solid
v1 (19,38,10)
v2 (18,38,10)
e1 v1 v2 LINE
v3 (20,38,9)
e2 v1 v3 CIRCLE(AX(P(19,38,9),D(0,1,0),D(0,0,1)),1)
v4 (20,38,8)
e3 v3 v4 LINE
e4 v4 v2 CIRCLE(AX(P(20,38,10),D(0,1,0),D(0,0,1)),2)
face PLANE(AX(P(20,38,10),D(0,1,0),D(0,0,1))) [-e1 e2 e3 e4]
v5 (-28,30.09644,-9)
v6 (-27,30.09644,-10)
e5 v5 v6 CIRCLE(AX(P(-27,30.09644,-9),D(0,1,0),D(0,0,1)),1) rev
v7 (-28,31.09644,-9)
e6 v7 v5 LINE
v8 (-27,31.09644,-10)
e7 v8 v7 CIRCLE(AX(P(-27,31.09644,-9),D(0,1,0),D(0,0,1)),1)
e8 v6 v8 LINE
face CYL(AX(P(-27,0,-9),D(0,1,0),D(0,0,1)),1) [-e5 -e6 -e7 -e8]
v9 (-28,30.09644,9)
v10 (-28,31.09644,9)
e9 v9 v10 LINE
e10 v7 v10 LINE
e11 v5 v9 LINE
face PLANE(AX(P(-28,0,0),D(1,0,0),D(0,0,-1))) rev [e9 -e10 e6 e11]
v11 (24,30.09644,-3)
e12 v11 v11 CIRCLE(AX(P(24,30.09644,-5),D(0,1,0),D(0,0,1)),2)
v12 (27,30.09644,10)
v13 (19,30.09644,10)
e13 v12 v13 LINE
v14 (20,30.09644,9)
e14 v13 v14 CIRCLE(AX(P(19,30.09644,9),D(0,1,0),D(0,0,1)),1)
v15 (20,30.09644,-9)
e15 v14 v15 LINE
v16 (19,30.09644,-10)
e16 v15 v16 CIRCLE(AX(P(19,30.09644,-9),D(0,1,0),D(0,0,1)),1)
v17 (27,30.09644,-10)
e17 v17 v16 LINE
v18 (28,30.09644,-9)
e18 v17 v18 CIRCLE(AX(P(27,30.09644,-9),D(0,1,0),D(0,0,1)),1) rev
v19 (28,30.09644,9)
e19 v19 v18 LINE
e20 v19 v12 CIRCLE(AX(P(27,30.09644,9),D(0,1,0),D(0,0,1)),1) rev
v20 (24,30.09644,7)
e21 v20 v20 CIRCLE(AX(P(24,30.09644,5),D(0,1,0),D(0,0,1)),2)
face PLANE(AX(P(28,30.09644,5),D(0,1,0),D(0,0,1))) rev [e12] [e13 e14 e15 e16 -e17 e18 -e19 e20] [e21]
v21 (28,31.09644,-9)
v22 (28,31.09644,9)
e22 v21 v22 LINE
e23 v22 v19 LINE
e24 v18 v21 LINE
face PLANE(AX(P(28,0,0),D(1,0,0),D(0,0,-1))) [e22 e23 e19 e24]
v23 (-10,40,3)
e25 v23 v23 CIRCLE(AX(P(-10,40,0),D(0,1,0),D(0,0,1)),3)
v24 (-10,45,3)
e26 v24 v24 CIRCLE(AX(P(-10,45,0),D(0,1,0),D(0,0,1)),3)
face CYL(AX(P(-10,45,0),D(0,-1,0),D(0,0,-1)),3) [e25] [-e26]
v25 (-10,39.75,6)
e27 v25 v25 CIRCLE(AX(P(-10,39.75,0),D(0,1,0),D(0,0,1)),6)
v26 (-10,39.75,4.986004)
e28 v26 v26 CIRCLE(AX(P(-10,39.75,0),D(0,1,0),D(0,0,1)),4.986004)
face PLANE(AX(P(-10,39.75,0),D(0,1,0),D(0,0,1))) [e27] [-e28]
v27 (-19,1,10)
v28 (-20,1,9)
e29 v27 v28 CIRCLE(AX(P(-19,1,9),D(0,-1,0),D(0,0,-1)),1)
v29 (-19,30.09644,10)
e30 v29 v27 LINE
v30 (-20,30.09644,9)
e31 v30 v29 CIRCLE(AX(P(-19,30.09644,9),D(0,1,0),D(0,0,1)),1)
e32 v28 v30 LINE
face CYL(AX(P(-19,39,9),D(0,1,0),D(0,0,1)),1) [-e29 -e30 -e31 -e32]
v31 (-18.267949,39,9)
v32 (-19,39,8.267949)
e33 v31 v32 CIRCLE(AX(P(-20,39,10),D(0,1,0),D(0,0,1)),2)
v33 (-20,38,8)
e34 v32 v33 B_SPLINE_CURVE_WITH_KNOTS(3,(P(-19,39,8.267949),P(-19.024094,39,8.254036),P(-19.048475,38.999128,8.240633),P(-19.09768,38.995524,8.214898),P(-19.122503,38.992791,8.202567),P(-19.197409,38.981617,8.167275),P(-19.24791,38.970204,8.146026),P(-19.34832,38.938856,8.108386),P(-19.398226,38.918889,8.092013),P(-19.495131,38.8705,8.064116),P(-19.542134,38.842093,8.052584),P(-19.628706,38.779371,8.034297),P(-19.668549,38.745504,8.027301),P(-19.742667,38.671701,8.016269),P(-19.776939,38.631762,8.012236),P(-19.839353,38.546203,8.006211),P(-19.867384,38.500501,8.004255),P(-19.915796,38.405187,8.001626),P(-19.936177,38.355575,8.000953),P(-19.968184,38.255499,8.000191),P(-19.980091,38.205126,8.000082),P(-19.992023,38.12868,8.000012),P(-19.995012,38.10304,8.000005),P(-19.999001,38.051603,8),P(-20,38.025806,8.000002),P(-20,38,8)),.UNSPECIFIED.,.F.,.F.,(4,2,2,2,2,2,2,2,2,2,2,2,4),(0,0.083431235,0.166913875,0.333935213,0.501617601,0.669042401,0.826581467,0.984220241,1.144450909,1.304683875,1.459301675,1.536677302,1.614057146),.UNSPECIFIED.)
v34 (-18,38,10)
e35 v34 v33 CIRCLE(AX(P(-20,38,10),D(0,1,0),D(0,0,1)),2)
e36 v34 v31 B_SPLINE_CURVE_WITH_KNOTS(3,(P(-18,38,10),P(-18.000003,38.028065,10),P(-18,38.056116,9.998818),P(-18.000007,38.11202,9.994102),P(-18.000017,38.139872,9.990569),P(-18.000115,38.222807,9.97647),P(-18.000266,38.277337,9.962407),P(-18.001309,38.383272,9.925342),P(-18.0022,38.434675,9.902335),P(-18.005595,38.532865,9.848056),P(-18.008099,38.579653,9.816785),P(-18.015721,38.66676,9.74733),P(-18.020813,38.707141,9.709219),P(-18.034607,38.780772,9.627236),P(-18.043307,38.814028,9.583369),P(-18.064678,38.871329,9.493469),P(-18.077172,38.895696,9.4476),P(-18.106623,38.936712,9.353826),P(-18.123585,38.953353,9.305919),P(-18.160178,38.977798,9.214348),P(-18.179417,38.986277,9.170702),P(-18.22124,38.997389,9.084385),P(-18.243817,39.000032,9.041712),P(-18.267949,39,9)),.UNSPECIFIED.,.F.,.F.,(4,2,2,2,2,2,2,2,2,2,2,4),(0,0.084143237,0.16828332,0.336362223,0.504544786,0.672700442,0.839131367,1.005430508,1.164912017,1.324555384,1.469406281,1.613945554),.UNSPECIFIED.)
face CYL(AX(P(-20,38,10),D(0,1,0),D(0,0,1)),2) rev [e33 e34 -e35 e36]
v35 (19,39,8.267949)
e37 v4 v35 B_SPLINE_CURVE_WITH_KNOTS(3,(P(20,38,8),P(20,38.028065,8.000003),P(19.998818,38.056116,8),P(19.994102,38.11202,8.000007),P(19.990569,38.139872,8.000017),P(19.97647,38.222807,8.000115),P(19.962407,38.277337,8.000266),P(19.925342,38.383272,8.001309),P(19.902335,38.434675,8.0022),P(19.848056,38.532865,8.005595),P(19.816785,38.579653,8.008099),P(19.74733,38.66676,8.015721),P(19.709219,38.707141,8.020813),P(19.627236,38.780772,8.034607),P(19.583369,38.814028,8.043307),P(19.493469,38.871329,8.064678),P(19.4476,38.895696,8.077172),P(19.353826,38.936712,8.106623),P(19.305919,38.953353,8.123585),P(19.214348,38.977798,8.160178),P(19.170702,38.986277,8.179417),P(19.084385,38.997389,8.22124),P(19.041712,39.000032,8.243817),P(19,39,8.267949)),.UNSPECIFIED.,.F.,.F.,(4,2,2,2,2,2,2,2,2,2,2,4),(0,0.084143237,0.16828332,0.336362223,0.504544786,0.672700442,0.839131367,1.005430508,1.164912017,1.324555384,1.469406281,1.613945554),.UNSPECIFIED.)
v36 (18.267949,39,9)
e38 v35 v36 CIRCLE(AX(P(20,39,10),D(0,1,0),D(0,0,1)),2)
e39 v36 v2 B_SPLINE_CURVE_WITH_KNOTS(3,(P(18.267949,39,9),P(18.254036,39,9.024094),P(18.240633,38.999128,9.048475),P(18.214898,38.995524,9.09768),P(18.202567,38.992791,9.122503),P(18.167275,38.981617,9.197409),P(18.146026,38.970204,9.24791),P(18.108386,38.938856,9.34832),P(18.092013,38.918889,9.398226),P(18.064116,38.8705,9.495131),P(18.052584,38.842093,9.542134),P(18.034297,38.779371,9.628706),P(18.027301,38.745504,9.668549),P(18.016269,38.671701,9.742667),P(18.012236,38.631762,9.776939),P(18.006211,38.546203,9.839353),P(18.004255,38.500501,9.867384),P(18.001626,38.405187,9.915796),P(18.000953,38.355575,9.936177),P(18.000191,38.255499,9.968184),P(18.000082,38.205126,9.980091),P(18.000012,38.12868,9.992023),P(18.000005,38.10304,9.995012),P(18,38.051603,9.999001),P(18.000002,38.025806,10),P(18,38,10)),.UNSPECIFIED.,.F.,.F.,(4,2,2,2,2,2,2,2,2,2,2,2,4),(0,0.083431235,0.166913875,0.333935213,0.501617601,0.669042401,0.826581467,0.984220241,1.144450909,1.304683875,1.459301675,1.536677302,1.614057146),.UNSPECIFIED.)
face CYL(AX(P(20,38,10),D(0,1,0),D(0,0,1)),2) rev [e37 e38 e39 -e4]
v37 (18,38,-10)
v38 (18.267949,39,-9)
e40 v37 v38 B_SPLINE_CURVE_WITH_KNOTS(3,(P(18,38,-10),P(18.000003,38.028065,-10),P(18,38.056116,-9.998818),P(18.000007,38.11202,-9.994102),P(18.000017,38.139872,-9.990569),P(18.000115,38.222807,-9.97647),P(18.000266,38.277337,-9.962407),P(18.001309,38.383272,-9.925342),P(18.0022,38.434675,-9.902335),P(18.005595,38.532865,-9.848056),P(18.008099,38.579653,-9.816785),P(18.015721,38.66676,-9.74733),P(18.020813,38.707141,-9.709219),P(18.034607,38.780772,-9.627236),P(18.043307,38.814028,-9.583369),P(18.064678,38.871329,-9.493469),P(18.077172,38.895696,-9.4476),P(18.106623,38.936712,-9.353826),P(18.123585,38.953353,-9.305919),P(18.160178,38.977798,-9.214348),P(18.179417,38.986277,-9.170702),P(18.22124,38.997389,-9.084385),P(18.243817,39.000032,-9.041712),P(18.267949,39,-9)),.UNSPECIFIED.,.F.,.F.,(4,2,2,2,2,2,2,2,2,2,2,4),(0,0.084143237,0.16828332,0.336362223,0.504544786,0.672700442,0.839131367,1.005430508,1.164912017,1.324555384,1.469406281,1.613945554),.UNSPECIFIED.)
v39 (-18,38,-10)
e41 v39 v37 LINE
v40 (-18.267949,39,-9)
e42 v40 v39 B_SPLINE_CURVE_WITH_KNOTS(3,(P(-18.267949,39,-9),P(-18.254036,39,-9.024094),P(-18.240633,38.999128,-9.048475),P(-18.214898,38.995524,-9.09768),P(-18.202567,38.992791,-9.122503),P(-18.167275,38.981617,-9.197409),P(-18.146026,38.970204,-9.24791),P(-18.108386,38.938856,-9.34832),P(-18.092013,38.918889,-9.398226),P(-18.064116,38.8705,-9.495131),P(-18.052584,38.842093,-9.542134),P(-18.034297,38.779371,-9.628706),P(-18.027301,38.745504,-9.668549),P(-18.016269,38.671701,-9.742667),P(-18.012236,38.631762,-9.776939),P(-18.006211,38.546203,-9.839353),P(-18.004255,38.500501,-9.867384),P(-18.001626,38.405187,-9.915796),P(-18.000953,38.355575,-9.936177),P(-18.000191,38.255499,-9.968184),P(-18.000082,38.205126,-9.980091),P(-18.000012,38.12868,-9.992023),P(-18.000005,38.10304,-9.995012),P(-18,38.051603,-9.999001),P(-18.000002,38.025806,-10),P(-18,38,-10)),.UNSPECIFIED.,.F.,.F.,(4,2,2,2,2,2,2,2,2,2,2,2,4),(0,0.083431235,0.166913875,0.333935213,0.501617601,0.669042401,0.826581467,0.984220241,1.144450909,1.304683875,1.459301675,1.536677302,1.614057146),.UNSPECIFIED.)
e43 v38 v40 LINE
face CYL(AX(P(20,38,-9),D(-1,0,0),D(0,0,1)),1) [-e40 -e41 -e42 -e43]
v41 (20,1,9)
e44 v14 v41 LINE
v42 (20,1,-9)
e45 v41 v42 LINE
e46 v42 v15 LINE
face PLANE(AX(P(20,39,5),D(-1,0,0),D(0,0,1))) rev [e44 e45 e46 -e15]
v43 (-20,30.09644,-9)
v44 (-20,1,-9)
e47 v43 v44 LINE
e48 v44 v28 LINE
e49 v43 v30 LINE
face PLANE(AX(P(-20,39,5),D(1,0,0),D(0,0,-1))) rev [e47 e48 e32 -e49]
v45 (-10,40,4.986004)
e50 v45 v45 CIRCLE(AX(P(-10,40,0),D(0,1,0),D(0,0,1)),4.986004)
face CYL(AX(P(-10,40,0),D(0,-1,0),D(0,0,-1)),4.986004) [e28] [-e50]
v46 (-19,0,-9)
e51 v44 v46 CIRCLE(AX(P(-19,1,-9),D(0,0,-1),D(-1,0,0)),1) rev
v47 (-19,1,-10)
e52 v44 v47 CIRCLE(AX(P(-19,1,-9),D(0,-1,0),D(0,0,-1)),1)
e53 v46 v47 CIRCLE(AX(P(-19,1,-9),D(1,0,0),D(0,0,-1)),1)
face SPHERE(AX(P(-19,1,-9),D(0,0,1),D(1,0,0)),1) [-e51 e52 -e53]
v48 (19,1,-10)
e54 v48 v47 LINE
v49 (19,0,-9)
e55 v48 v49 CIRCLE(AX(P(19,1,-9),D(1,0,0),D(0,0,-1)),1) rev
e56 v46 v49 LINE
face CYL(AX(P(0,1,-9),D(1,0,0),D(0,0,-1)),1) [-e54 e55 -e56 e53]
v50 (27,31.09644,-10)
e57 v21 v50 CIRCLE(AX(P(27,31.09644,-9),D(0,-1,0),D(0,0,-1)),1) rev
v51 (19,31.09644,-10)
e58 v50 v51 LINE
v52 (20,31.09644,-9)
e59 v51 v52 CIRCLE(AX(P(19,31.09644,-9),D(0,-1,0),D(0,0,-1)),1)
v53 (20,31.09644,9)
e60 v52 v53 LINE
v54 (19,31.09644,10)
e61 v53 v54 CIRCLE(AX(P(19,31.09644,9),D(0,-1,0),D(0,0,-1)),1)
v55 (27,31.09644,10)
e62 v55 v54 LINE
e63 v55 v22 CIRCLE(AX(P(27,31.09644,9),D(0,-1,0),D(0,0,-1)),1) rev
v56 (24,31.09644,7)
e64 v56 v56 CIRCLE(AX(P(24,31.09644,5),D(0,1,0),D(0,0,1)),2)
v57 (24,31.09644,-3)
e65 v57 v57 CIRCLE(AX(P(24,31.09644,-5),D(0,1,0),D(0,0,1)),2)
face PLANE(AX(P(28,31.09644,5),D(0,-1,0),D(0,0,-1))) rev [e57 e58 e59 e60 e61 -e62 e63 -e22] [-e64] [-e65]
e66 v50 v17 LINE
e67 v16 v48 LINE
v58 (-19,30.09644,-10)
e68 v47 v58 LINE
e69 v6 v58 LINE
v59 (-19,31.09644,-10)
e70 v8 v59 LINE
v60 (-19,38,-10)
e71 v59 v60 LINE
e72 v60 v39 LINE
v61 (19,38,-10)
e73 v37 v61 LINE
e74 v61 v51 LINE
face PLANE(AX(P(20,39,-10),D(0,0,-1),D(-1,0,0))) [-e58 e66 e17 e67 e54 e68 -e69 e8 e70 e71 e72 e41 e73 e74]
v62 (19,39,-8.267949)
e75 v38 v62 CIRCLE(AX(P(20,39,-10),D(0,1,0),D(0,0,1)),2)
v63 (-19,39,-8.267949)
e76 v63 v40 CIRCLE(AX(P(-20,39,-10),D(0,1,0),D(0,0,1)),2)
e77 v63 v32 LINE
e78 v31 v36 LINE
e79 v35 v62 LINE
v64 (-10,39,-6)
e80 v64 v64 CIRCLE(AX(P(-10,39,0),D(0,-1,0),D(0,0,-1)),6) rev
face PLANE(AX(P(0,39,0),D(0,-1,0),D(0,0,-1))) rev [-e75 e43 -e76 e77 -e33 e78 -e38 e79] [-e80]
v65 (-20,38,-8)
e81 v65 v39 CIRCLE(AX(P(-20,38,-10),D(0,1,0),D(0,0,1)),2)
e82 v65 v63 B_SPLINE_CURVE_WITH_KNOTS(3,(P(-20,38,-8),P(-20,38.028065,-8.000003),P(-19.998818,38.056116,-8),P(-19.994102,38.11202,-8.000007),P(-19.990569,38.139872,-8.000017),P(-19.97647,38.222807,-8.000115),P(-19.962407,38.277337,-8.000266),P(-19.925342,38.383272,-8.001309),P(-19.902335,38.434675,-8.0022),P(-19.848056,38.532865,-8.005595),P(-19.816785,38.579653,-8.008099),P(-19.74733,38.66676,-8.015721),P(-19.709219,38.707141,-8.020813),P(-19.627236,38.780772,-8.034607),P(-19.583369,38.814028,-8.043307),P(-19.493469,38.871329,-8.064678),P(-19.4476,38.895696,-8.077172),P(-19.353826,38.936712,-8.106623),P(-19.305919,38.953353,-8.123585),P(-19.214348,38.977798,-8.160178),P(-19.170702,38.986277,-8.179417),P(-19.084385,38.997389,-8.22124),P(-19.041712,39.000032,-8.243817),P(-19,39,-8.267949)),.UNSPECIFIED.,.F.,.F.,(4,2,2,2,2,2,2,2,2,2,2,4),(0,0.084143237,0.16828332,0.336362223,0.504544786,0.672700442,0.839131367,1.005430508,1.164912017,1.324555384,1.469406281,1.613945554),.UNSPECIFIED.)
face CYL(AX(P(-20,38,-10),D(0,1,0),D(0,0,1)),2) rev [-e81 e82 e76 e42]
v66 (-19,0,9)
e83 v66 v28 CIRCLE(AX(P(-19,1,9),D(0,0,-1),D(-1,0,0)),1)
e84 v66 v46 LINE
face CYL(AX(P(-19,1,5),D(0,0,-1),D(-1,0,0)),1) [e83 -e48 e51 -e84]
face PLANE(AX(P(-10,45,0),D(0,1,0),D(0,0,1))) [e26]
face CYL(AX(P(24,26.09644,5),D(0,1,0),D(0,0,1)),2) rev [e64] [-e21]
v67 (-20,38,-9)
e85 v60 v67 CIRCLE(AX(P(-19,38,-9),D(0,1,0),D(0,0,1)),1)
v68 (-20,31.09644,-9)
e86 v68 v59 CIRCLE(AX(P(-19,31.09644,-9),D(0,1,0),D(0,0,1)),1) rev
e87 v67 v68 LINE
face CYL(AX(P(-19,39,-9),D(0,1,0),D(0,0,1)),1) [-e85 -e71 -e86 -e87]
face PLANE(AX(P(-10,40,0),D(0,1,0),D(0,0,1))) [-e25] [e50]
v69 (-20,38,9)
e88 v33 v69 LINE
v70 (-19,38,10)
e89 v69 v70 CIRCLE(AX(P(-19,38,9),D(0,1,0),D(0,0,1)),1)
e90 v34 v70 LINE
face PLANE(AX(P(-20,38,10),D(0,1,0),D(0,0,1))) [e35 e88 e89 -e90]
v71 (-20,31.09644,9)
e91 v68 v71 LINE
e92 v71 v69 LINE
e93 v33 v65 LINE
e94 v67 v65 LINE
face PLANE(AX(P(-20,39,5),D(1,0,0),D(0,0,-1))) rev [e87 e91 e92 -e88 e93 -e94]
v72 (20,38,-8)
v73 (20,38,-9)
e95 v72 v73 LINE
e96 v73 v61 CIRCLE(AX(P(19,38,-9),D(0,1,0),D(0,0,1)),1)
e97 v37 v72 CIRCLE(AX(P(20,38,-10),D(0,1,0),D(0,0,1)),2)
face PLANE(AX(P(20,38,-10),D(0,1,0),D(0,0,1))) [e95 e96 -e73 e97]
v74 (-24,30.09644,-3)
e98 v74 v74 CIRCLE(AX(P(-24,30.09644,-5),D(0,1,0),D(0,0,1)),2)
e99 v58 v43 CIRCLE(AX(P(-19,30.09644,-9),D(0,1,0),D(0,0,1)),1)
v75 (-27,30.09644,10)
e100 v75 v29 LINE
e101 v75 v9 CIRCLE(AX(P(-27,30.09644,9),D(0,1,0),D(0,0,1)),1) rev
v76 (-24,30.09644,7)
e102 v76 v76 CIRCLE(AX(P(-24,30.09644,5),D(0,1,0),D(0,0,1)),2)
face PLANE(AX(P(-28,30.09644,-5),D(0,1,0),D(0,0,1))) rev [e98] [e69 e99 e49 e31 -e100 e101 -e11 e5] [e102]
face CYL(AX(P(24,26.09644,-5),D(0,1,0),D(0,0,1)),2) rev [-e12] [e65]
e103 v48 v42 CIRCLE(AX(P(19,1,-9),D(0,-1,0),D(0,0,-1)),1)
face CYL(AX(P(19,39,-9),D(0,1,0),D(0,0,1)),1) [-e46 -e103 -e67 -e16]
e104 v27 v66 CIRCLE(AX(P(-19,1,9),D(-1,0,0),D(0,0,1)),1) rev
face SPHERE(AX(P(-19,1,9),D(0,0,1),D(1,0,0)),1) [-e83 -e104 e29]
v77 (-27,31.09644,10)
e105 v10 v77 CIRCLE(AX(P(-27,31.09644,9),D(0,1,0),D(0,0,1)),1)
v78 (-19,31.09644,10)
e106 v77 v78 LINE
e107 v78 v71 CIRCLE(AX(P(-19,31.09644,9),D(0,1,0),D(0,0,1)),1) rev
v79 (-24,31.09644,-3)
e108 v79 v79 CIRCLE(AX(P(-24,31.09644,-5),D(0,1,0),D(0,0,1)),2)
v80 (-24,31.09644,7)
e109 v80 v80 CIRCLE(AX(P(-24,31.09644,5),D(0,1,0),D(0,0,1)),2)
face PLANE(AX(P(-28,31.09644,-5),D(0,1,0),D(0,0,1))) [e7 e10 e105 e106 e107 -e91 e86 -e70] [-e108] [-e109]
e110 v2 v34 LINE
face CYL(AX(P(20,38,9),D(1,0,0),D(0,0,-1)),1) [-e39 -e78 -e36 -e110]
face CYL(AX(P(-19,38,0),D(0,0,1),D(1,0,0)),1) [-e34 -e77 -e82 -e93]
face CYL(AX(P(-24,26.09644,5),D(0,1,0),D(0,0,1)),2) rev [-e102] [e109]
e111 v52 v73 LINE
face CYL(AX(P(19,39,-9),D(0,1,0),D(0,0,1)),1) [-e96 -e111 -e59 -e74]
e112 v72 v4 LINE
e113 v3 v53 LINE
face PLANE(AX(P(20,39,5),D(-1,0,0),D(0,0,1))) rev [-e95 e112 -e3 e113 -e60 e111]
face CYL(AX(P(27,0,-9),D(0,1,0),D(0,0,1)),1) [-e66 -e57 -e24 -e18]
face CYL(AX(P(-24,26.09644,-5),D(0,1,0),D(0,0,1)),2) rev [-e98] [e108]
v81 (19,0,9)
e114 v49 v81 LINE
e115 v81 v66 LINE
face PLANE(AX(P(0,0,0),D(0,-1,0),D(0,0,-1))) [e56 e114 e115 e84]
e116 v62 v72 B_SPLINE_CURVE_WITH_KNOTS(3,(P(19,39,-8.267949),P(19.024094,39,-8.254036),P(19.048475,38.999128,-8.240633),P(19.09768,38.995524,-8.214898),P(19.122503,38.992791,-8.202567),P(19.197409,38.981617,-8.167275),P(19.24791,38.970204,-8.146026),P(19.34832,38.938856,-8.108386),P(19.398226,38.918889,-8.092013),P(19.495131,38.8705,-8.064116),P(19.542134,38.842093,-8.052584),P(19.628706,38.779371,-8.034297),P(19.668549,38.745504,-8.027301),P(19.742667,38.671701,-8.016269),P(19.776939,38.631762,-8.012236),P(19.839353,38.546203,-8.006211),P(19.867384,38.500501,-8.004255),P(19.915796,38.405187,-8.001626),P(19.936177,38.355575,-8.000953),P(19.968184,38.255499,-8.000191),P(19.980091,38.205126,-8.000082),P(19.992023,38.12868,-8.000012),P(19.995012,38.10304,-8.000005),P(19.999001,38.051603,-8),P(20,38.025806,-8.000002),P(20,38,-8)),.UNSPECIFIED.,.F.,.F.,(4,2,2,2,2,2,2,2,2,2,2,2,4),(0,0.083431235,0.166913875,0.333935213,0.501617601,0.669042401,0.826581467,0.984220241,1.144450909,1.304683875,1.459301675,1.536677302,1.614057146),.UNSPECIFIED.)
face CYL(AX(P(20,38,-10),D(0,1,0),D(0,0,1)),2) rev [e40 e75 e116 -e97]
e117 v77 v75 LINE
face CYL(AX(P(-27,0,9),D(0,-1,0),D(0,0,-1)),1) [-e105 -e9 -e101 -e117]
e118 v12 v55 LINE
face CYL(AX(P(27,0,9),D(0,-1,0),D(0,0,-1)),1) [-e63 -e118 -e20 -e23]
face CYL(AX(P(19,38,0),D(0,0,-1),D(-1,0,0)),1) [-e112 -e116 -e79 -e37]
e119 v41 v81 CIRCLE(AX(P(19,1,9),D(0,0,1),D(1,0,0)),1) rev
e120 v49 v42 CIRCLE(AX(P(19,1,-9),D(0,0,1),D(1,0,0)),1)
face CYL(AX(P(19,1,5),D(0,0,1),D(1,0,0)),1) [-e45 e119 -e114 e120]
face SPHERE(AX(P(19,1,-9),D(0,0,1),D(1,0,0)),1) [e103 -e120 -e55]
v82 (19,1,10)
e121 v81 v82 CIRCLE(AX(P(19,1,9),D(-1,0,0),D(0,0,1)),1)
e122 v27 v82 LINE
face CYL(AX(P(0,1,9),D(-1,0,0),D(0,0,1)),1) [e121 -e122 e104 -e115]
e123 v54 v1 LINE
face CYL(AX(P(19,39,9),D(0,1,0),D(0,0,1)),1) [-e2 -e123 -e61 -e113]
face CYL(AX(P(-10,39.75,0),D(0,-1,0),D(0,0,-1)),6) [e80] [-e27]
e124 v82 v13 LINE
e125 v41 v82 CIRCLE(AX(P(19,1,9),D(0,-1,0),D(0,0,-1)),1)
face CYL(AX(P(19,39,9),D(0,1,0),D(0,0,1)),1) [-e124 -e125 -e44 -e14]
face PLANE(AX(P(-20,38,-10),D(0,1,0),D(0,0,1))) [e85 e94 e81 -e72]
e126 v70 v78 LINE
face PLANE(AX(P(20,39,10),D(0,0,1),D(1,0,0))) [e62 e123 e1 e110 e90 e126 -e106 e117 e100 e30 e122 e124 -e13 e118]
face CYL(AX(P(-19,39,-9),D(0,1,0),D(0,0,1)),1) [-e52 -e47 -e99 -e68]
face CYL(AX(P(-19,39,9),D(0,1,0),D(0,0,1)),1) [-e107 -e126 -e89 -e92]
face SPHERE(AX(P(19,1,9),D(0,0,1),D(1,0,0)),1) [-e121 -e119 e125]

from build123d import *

# Parameters (mm, degrees)
SKETCH_1_W          = 40
SKETCH_1_H          = 10
EXTRUDE_2_DEPTH     = 39
SKETCH_4_W          = 10
SKETCH_4_H          = 1
EXTRUDE_8_DEPTH     = 8
SKETCH_12_W         = 10
SKETCH_12_H         = 1
EXTRUDE_9_DEPTH     = 8
SKETCH_14_W         = 40
SKETCH_14_H         = 20
EXTRUDE_10_DEPTH    = 39
SKETCH_15_W         = 20
SKETCH_15_H         = 1
EXTRUDE_12_DEPTH    = 8
SKETCH_16_W         = 20
SKETCH_16_H         = 1
EXTRUDE_13_DEPTH    = 8
SKETCH_17_R         = 6
EXTRUDE_15_DEPTH    = 0.75
SKETCH_19_R         = 4.98600358
EXTRUDE_16_DEPTH    = 0.25
SKETCH_20_R         = 3
EXTRUDE_17_DEPTH    = 5
SKETCH_22_R         = 2
CUT_EXTRUDE_1_DEPTH = 5
SKETCH_23_R         = 2
CUT_EXTRUDE_3_DEPTH = 5
FILLET_12_R         = 1
FILLET_13_R         = 1
SKETCH_27_R         = 2
CUT_EXTRUDE_4_DEPTH = 1
FILLET_14_R         = 1
FILLET_START        = -9
FILLET_15_DEPTH     = 18
FILLET_START_2      = -19.678632008
FILLET_15_2_DEPTH   = 39.357264016
FILLET_16_R         = 1


with BuildPart() as part:
    # 草图1 → 凸台-拉伸2 (new body)
    with BuildSketch(Plane(origin=(0, 0, 0), x_dir=(1, 0, 0), z_dir=(0, 1, 0))):
        Rectangle(SKETCH_1_W, SKETCH_1_H)
    extrude(amount=EXTRUDE_2_DEPTH)

    # 草图4 → 凸台-拉伸8 (add)
    with BuildSketch(Plane.ZY.offset(20)):
        with Locations((0, 30.596439846)):
            Rectangle(SKETCH_4_W, SKETCH_4_H)
    extrude(amount=EXTRUDE_8_DEPTH)

    # 草图12 → 凸台-拉伸9 (add)
    with BuildSketch(Plane(origin=(20, 0, 0), x_dir=(0, 0, -1), z_dir=(1, 0, 0))):
        with Locations((0, 30.596439846)):
            Rectangle(SKETCH_12_W, SKETCH_12_H)
    extrude(amount=EXTRUDE_9_DEPTH)

    # 草图14 → 凸台-拉伸10 (add)
    with BuildSketch(Plane.XZ):
        Rectangle(SKETCH_14_W, SKETCH_14_H)
    extrude(amount=-EXTRUDE_10_DEPTH)

    # 草图15 → 凸台-拉伸12 (add)
    with BuildSketch(Plane.ZY.offset(20)):
        with Locations((0, 30.596439846)):
            Rectangle(SKETCH_15_W, SKETCH_15_H)
    extrude(amount=EXTRUDE_12_DEPTH)

    # 草图16 → 凸台-拉伸13 (add)
    with BuildSketch(Plane(origin=(20, 0, 0), x_dir=(0, 0, -1), z_dir=(1, 0, 0))):
        with Locations((0, 30.596439846)):
            Rectangle(SKETCH_16_W, SKETCH_16_H)
    extrude(amount=EXTRUDE_13_DEPTH)

    # 草图17 → 凸台-拉伸15 (add)
    with BuildSketch(Plane(origin=(0, 39, 0), x_dir=(1, 0, 0), z_dir=(0, 1, 0))):
        with Locations(Location((-10, 0, 0), (0, 0, 90))):
            Circle(SKETCH_17_R)
    extrude(amount=EXTRUDE_15_DEPTH)

    # 草图19 → 凸台-拉伸16 (add)
    with BuildSketch(Plane(origin=(0, 39.75, 0), x_dir=(1, 0, 0), z_dir=(0, 1, 0))):
        with Locations(Location((-10, 0, 0), (0, 0, 270))):
            Circle(SKETCH_19_R)
    extrude(amount=EXTRUDE_16_DEPTH)

    # 草图20 → 凸台-拉伸17 (add)
    with BuildSketch(Plane(origin=(0, 40, 0), x_dir=(1, 0, 0), z_dir=(0, 1, 0))):
        with Locations(Location((-10, 0, 0), (0, 0, 270))):
            Circle(SKETCH_20_R)
    extrude(amount=EXTRUDE_17_DEPTH)

    # 草图22 → 切除-拉伸1 (cut)
    with BuildSketch(Plane(origin=(0, 31.096439846, 0), x_dir=(1, 0, 0), z_dir=(0, 1, 0))):
        with Locations(Location((-24, 5, 0), (0, 0, 270))):
            Circle(SKETCH_22_R)
        with Locations(Location((-24, -5, 0), (0, 0, 270))):
            Circle(SKETCH_22_R)
    extrude(amount=-CUT_EXTRUDE_1_DEPTH, mode=Mode.SUBTRACT)

    # 草图23 → 切除-拉伸3 (cut)
    with BuildSketch(Plane(origin=(0, 31.096439846, 0), x_dir=(1, 0, 0), z_dir=(0, 1, 0))):
        with Locations(Location((24, 5, 0), (0, 0, 270))):
            Circle(SKETCH_23_R)
        with Locations(Location((24, -5, 0), (0, 0, 270))):
            Circle(SKETCH_23_R)
    extrude(amount=-CUT_EXTRUDE_3_DEPTH, mode=Mode.SUBTRACT)

    # 圆角12
    fillet_12_edges = [part.edges().sort_by_distance(p)[0] for p in [
        (0, 0, -10),
        (0, 0, 10),
        (-20, 0, 0),
        (20, 0, 0),
    ]]
    fillet(fillet_12_edges, radius=FILLET_12_R)

    # 圆角13
    # the kernel refuses this fillet: 1 mm, written as the material it takes off along each edge
    with BuildSketch(Plane(origin=(19, 1, -9), x_dir=(1, 0, 0), z_dir=(0, 0, -1))) as fillet_13_piece_1_section:
        Polygon((0, 0), (FILLET_13_R * 1.02, 0), (FILLET_13_R * 1.02, FILLET_13_R * 1.02), (0, FILLET_13_R * 1.02), align=None)
    fillet_13_piece_1 = extrude(amount=FILLET_13_R * 1.02, mode=Mode.PRIVATE)
    fillet_13_piece_1 = fillet_13_piece_1 - Plane(origin=(19, 1, -9), x_dir=(-0.7071067811865475, 0.7071067811865475, 0), z_dir=(0, 0, -1)) * Sphere(FILLET_13_R, mode=Mode.PRIVATE)
    add(fillet_13_piece_1, mode=Mode.SUBTRACT)
    with BuildSketch(Plane(origin=(19, 1, 9), x_dir=(0, 0, 1), z_dir=(1, 0, 0))) as fillet_13_piece_2_section:
        Polygon((0, 0), (FILLET_13_R * 1.02, 0), (FILLET_13_R * 1.02, FILLET_13_R * 1.02), (0, FILLET_13_R * 1.02), align=None)
    fillet_13_piece_2 = extrude(amount=FILLET_13_R * 1.02, mode=Mode.PRIVATE)
    fillet_13_piece_2 = fillet_13_piece_2 - Plane(origin=(19, 1, 9), x_dir=(0, 0.7071067811865475, -0.7071067811865475), z_dir=(1, 0, 0)) * Sphere(FILLET_13_R, mode=Mode.PRIVATE)
    add(fillet_13_piece_2, mode=Mode.SUBTRACT)
    with BuildSketch(Plane(origin=(-19, 1, -9), x_dir=(-1, 0, 0), z_dir=(0, 0, -1))) as fillet_13_piece_3_section:
        Polygon((0, 0), (FILLET_13_R * 1.02, 0), (FILLET_13_R * 1.02, -FILLET_13_R * 1.02), (0, -FILLET_13_R * 1.02), align=None)
    fillet_13_piece_3 = extrude(amount=FILLET_13_R * 1.02, mode=Mode.PRIVATE)
    fillet_13_piece_3 = fillet_13_piece_3 - Plane(origin=(-19, 1, -9), x_dir=(0.7071067811865475, 0.7071067811865475, 0), z_dir=(0, 0, -1)) * Sphere(FILLET_13_R, mode=Mode.PRIVATE)
    add(fillet_13_piece_3, mode=Mode.SUBTRACT)
    with BuildSketch(Plane(origin=(-19, 1, 9), x_dir=(0, 0, 1), z_dir=(-1, 0, 0))) as fillet_13_piece_4_section:
        Polygon((0, 0), (FILLET_13_R * 1.02, 0), (FILLET_13_R * 1.02, -FILLET_13_R * 1.02), (0, -FILLET_13_R * 1.02), align=None)
    fillet_13_piece_4 = extrude(amount=FILLET_13_R * 1.02, mode=Mode.PRIVATE)
    fillet_13_piece_4 = fillet_13_piece_4 - Plane(origin=(-19, 1, 9), x_dir=(0, 0.7071067811865475, -0.7071067811865475), z_dir=(-1, 0, 0)) * Sphere(FILLET_13_R, mode=Mode.PRIVATE)
    add(fillet_13_piece_4, mode=Mode.SUBTRACT)
    with BuildSketch(Plane(origin=(-20, 1, -10), x_dir=(1, 0, 0), z_dir=(0, 1, 0)), Plane(origin=(-20, 1, 10), x_dir=(0, 0, -1), z_dir=(0, 1, 0))) as fillet_13_piece_5:
        with BuildLine():
            CenterArc((FILLET_13_R, -FILLET_13_R), FILLET_13_R, 90, 90)
            Line((0, -FILLET_13_R), (0, 0))
            Line((0, 0), (FILLET_13_R, 0))
        make_face()
    extrude(amount=29.096439846, mode=Mode.SUBTRACT)
    with BuildSketch(Plane(origin=(20, 1, -10), x_dir=(-1, 0, 0), z_dir=(0, 1, 0)), Plane(origin=(20, 1, 10), x_dir=(0, 0, -1), z_dir=(0, 1, 0))) as fillet_13_piece_6:
        with BuildLine():
            CenterArc((FILLET_13_R, FILLET_13_R), FILLET_13_R, 180, 90)
            Line((0, FILLET_13_R), (0, 0))
            Line((0, 0), (FILLET_13_R, 0))
        make_face()
    extrude(amount=29.096439846, mode=Mode.SUBTRACT)

    # 草图27 → 切除-拉伸4 (cut)
    with BuildSketch(Plane(origin=(0, 39, 0), x_dir=(1, 0, 0), z_dir=(0, 1, 0))):
        with Locations((-20, 10)):
            Circle(SKETCH_27_R)
        with Locations((20, 10)):
            Circle(SKETCH_27_R)
        with Locations((20, -10)):
            Circle(SKETCH_27_R)
        with Locations((-20, -10)):
            Circle(SKETCH_27_R)
    extrude(amount=-CUT_EXTRUDE_4_DEPTH, mode=Mode.SUBTRACT)

    # 圆角14
    fillet_14_edges = [part.edges().sort_by_distance(p)[0] for p in [
        (-20, 34.548219923, -10),
        (20, 34.548219923, -10),
        (20, 34.548219923, 10),
        (-20, 34.548219923, 10),
    ]]
    fillet(fillet_14_edges, radius=FILLET_14_R)

    # 圆角15: read off the stored shape, not the designer's step
    # 圆角15 outline → 圆角15 (cut)
    with BuildSketch(Plane.XY.offset(FILLET_START)):
        with BuildLine():
            Line((20, 39), (19, 39))
            ThreePointArc((19, 39), (19.707106781, 38.707106781), (20, 38))
            Line((20, 38), (20, 39))
        make_face()
        with BuildLine():
            ThreePointArc((-20, 38), (-19.707106781, 38.707106781), (-19, 39))
            Line((-19, 39), (-20, 39))
            Line((-20, 39), (-20, 38))
        make_face()
    extrude(amount=FILLET_15_DEPTH, mode=Mode.SUBTRACT)

    # Fillet 15 2 outline → Fillet 15 2 (cut)
    with BuildSketch(Plane.YZ.offset(FILLET_START_2)):
        with BuildLine():
            Line((39, -10), (39, -9))
            ThreePointArc((39, -9), (38.707106781, -9.707106781), (38, -10))
            Line((38, -10), (39, -10))
        make_face()
        with BuildLine():
            ThreePointArc((38, 10), (38.707106781, 9.707106781), (39, 9))
            Line((39, 9), (39, 10))
            Line((39, 10), (38, 10))
        make_face()
    extrude(amount=FILLET_15_2_DEPTH, mode=Mode.SUBTRACT)

    # 圆角16
    fillet_16_edges = [part.edges().sort_by_distance(p)[0] for p in [
        (28, 30.596439846, -10),
        (28, 30.596439846, 10),
        (-28, 30.596439846, -10),
        (-28, 30.596439846, 10),
    ]]
    fillet(fillet_16_edges, radius=FILLET_16_R)


solid = part.part
